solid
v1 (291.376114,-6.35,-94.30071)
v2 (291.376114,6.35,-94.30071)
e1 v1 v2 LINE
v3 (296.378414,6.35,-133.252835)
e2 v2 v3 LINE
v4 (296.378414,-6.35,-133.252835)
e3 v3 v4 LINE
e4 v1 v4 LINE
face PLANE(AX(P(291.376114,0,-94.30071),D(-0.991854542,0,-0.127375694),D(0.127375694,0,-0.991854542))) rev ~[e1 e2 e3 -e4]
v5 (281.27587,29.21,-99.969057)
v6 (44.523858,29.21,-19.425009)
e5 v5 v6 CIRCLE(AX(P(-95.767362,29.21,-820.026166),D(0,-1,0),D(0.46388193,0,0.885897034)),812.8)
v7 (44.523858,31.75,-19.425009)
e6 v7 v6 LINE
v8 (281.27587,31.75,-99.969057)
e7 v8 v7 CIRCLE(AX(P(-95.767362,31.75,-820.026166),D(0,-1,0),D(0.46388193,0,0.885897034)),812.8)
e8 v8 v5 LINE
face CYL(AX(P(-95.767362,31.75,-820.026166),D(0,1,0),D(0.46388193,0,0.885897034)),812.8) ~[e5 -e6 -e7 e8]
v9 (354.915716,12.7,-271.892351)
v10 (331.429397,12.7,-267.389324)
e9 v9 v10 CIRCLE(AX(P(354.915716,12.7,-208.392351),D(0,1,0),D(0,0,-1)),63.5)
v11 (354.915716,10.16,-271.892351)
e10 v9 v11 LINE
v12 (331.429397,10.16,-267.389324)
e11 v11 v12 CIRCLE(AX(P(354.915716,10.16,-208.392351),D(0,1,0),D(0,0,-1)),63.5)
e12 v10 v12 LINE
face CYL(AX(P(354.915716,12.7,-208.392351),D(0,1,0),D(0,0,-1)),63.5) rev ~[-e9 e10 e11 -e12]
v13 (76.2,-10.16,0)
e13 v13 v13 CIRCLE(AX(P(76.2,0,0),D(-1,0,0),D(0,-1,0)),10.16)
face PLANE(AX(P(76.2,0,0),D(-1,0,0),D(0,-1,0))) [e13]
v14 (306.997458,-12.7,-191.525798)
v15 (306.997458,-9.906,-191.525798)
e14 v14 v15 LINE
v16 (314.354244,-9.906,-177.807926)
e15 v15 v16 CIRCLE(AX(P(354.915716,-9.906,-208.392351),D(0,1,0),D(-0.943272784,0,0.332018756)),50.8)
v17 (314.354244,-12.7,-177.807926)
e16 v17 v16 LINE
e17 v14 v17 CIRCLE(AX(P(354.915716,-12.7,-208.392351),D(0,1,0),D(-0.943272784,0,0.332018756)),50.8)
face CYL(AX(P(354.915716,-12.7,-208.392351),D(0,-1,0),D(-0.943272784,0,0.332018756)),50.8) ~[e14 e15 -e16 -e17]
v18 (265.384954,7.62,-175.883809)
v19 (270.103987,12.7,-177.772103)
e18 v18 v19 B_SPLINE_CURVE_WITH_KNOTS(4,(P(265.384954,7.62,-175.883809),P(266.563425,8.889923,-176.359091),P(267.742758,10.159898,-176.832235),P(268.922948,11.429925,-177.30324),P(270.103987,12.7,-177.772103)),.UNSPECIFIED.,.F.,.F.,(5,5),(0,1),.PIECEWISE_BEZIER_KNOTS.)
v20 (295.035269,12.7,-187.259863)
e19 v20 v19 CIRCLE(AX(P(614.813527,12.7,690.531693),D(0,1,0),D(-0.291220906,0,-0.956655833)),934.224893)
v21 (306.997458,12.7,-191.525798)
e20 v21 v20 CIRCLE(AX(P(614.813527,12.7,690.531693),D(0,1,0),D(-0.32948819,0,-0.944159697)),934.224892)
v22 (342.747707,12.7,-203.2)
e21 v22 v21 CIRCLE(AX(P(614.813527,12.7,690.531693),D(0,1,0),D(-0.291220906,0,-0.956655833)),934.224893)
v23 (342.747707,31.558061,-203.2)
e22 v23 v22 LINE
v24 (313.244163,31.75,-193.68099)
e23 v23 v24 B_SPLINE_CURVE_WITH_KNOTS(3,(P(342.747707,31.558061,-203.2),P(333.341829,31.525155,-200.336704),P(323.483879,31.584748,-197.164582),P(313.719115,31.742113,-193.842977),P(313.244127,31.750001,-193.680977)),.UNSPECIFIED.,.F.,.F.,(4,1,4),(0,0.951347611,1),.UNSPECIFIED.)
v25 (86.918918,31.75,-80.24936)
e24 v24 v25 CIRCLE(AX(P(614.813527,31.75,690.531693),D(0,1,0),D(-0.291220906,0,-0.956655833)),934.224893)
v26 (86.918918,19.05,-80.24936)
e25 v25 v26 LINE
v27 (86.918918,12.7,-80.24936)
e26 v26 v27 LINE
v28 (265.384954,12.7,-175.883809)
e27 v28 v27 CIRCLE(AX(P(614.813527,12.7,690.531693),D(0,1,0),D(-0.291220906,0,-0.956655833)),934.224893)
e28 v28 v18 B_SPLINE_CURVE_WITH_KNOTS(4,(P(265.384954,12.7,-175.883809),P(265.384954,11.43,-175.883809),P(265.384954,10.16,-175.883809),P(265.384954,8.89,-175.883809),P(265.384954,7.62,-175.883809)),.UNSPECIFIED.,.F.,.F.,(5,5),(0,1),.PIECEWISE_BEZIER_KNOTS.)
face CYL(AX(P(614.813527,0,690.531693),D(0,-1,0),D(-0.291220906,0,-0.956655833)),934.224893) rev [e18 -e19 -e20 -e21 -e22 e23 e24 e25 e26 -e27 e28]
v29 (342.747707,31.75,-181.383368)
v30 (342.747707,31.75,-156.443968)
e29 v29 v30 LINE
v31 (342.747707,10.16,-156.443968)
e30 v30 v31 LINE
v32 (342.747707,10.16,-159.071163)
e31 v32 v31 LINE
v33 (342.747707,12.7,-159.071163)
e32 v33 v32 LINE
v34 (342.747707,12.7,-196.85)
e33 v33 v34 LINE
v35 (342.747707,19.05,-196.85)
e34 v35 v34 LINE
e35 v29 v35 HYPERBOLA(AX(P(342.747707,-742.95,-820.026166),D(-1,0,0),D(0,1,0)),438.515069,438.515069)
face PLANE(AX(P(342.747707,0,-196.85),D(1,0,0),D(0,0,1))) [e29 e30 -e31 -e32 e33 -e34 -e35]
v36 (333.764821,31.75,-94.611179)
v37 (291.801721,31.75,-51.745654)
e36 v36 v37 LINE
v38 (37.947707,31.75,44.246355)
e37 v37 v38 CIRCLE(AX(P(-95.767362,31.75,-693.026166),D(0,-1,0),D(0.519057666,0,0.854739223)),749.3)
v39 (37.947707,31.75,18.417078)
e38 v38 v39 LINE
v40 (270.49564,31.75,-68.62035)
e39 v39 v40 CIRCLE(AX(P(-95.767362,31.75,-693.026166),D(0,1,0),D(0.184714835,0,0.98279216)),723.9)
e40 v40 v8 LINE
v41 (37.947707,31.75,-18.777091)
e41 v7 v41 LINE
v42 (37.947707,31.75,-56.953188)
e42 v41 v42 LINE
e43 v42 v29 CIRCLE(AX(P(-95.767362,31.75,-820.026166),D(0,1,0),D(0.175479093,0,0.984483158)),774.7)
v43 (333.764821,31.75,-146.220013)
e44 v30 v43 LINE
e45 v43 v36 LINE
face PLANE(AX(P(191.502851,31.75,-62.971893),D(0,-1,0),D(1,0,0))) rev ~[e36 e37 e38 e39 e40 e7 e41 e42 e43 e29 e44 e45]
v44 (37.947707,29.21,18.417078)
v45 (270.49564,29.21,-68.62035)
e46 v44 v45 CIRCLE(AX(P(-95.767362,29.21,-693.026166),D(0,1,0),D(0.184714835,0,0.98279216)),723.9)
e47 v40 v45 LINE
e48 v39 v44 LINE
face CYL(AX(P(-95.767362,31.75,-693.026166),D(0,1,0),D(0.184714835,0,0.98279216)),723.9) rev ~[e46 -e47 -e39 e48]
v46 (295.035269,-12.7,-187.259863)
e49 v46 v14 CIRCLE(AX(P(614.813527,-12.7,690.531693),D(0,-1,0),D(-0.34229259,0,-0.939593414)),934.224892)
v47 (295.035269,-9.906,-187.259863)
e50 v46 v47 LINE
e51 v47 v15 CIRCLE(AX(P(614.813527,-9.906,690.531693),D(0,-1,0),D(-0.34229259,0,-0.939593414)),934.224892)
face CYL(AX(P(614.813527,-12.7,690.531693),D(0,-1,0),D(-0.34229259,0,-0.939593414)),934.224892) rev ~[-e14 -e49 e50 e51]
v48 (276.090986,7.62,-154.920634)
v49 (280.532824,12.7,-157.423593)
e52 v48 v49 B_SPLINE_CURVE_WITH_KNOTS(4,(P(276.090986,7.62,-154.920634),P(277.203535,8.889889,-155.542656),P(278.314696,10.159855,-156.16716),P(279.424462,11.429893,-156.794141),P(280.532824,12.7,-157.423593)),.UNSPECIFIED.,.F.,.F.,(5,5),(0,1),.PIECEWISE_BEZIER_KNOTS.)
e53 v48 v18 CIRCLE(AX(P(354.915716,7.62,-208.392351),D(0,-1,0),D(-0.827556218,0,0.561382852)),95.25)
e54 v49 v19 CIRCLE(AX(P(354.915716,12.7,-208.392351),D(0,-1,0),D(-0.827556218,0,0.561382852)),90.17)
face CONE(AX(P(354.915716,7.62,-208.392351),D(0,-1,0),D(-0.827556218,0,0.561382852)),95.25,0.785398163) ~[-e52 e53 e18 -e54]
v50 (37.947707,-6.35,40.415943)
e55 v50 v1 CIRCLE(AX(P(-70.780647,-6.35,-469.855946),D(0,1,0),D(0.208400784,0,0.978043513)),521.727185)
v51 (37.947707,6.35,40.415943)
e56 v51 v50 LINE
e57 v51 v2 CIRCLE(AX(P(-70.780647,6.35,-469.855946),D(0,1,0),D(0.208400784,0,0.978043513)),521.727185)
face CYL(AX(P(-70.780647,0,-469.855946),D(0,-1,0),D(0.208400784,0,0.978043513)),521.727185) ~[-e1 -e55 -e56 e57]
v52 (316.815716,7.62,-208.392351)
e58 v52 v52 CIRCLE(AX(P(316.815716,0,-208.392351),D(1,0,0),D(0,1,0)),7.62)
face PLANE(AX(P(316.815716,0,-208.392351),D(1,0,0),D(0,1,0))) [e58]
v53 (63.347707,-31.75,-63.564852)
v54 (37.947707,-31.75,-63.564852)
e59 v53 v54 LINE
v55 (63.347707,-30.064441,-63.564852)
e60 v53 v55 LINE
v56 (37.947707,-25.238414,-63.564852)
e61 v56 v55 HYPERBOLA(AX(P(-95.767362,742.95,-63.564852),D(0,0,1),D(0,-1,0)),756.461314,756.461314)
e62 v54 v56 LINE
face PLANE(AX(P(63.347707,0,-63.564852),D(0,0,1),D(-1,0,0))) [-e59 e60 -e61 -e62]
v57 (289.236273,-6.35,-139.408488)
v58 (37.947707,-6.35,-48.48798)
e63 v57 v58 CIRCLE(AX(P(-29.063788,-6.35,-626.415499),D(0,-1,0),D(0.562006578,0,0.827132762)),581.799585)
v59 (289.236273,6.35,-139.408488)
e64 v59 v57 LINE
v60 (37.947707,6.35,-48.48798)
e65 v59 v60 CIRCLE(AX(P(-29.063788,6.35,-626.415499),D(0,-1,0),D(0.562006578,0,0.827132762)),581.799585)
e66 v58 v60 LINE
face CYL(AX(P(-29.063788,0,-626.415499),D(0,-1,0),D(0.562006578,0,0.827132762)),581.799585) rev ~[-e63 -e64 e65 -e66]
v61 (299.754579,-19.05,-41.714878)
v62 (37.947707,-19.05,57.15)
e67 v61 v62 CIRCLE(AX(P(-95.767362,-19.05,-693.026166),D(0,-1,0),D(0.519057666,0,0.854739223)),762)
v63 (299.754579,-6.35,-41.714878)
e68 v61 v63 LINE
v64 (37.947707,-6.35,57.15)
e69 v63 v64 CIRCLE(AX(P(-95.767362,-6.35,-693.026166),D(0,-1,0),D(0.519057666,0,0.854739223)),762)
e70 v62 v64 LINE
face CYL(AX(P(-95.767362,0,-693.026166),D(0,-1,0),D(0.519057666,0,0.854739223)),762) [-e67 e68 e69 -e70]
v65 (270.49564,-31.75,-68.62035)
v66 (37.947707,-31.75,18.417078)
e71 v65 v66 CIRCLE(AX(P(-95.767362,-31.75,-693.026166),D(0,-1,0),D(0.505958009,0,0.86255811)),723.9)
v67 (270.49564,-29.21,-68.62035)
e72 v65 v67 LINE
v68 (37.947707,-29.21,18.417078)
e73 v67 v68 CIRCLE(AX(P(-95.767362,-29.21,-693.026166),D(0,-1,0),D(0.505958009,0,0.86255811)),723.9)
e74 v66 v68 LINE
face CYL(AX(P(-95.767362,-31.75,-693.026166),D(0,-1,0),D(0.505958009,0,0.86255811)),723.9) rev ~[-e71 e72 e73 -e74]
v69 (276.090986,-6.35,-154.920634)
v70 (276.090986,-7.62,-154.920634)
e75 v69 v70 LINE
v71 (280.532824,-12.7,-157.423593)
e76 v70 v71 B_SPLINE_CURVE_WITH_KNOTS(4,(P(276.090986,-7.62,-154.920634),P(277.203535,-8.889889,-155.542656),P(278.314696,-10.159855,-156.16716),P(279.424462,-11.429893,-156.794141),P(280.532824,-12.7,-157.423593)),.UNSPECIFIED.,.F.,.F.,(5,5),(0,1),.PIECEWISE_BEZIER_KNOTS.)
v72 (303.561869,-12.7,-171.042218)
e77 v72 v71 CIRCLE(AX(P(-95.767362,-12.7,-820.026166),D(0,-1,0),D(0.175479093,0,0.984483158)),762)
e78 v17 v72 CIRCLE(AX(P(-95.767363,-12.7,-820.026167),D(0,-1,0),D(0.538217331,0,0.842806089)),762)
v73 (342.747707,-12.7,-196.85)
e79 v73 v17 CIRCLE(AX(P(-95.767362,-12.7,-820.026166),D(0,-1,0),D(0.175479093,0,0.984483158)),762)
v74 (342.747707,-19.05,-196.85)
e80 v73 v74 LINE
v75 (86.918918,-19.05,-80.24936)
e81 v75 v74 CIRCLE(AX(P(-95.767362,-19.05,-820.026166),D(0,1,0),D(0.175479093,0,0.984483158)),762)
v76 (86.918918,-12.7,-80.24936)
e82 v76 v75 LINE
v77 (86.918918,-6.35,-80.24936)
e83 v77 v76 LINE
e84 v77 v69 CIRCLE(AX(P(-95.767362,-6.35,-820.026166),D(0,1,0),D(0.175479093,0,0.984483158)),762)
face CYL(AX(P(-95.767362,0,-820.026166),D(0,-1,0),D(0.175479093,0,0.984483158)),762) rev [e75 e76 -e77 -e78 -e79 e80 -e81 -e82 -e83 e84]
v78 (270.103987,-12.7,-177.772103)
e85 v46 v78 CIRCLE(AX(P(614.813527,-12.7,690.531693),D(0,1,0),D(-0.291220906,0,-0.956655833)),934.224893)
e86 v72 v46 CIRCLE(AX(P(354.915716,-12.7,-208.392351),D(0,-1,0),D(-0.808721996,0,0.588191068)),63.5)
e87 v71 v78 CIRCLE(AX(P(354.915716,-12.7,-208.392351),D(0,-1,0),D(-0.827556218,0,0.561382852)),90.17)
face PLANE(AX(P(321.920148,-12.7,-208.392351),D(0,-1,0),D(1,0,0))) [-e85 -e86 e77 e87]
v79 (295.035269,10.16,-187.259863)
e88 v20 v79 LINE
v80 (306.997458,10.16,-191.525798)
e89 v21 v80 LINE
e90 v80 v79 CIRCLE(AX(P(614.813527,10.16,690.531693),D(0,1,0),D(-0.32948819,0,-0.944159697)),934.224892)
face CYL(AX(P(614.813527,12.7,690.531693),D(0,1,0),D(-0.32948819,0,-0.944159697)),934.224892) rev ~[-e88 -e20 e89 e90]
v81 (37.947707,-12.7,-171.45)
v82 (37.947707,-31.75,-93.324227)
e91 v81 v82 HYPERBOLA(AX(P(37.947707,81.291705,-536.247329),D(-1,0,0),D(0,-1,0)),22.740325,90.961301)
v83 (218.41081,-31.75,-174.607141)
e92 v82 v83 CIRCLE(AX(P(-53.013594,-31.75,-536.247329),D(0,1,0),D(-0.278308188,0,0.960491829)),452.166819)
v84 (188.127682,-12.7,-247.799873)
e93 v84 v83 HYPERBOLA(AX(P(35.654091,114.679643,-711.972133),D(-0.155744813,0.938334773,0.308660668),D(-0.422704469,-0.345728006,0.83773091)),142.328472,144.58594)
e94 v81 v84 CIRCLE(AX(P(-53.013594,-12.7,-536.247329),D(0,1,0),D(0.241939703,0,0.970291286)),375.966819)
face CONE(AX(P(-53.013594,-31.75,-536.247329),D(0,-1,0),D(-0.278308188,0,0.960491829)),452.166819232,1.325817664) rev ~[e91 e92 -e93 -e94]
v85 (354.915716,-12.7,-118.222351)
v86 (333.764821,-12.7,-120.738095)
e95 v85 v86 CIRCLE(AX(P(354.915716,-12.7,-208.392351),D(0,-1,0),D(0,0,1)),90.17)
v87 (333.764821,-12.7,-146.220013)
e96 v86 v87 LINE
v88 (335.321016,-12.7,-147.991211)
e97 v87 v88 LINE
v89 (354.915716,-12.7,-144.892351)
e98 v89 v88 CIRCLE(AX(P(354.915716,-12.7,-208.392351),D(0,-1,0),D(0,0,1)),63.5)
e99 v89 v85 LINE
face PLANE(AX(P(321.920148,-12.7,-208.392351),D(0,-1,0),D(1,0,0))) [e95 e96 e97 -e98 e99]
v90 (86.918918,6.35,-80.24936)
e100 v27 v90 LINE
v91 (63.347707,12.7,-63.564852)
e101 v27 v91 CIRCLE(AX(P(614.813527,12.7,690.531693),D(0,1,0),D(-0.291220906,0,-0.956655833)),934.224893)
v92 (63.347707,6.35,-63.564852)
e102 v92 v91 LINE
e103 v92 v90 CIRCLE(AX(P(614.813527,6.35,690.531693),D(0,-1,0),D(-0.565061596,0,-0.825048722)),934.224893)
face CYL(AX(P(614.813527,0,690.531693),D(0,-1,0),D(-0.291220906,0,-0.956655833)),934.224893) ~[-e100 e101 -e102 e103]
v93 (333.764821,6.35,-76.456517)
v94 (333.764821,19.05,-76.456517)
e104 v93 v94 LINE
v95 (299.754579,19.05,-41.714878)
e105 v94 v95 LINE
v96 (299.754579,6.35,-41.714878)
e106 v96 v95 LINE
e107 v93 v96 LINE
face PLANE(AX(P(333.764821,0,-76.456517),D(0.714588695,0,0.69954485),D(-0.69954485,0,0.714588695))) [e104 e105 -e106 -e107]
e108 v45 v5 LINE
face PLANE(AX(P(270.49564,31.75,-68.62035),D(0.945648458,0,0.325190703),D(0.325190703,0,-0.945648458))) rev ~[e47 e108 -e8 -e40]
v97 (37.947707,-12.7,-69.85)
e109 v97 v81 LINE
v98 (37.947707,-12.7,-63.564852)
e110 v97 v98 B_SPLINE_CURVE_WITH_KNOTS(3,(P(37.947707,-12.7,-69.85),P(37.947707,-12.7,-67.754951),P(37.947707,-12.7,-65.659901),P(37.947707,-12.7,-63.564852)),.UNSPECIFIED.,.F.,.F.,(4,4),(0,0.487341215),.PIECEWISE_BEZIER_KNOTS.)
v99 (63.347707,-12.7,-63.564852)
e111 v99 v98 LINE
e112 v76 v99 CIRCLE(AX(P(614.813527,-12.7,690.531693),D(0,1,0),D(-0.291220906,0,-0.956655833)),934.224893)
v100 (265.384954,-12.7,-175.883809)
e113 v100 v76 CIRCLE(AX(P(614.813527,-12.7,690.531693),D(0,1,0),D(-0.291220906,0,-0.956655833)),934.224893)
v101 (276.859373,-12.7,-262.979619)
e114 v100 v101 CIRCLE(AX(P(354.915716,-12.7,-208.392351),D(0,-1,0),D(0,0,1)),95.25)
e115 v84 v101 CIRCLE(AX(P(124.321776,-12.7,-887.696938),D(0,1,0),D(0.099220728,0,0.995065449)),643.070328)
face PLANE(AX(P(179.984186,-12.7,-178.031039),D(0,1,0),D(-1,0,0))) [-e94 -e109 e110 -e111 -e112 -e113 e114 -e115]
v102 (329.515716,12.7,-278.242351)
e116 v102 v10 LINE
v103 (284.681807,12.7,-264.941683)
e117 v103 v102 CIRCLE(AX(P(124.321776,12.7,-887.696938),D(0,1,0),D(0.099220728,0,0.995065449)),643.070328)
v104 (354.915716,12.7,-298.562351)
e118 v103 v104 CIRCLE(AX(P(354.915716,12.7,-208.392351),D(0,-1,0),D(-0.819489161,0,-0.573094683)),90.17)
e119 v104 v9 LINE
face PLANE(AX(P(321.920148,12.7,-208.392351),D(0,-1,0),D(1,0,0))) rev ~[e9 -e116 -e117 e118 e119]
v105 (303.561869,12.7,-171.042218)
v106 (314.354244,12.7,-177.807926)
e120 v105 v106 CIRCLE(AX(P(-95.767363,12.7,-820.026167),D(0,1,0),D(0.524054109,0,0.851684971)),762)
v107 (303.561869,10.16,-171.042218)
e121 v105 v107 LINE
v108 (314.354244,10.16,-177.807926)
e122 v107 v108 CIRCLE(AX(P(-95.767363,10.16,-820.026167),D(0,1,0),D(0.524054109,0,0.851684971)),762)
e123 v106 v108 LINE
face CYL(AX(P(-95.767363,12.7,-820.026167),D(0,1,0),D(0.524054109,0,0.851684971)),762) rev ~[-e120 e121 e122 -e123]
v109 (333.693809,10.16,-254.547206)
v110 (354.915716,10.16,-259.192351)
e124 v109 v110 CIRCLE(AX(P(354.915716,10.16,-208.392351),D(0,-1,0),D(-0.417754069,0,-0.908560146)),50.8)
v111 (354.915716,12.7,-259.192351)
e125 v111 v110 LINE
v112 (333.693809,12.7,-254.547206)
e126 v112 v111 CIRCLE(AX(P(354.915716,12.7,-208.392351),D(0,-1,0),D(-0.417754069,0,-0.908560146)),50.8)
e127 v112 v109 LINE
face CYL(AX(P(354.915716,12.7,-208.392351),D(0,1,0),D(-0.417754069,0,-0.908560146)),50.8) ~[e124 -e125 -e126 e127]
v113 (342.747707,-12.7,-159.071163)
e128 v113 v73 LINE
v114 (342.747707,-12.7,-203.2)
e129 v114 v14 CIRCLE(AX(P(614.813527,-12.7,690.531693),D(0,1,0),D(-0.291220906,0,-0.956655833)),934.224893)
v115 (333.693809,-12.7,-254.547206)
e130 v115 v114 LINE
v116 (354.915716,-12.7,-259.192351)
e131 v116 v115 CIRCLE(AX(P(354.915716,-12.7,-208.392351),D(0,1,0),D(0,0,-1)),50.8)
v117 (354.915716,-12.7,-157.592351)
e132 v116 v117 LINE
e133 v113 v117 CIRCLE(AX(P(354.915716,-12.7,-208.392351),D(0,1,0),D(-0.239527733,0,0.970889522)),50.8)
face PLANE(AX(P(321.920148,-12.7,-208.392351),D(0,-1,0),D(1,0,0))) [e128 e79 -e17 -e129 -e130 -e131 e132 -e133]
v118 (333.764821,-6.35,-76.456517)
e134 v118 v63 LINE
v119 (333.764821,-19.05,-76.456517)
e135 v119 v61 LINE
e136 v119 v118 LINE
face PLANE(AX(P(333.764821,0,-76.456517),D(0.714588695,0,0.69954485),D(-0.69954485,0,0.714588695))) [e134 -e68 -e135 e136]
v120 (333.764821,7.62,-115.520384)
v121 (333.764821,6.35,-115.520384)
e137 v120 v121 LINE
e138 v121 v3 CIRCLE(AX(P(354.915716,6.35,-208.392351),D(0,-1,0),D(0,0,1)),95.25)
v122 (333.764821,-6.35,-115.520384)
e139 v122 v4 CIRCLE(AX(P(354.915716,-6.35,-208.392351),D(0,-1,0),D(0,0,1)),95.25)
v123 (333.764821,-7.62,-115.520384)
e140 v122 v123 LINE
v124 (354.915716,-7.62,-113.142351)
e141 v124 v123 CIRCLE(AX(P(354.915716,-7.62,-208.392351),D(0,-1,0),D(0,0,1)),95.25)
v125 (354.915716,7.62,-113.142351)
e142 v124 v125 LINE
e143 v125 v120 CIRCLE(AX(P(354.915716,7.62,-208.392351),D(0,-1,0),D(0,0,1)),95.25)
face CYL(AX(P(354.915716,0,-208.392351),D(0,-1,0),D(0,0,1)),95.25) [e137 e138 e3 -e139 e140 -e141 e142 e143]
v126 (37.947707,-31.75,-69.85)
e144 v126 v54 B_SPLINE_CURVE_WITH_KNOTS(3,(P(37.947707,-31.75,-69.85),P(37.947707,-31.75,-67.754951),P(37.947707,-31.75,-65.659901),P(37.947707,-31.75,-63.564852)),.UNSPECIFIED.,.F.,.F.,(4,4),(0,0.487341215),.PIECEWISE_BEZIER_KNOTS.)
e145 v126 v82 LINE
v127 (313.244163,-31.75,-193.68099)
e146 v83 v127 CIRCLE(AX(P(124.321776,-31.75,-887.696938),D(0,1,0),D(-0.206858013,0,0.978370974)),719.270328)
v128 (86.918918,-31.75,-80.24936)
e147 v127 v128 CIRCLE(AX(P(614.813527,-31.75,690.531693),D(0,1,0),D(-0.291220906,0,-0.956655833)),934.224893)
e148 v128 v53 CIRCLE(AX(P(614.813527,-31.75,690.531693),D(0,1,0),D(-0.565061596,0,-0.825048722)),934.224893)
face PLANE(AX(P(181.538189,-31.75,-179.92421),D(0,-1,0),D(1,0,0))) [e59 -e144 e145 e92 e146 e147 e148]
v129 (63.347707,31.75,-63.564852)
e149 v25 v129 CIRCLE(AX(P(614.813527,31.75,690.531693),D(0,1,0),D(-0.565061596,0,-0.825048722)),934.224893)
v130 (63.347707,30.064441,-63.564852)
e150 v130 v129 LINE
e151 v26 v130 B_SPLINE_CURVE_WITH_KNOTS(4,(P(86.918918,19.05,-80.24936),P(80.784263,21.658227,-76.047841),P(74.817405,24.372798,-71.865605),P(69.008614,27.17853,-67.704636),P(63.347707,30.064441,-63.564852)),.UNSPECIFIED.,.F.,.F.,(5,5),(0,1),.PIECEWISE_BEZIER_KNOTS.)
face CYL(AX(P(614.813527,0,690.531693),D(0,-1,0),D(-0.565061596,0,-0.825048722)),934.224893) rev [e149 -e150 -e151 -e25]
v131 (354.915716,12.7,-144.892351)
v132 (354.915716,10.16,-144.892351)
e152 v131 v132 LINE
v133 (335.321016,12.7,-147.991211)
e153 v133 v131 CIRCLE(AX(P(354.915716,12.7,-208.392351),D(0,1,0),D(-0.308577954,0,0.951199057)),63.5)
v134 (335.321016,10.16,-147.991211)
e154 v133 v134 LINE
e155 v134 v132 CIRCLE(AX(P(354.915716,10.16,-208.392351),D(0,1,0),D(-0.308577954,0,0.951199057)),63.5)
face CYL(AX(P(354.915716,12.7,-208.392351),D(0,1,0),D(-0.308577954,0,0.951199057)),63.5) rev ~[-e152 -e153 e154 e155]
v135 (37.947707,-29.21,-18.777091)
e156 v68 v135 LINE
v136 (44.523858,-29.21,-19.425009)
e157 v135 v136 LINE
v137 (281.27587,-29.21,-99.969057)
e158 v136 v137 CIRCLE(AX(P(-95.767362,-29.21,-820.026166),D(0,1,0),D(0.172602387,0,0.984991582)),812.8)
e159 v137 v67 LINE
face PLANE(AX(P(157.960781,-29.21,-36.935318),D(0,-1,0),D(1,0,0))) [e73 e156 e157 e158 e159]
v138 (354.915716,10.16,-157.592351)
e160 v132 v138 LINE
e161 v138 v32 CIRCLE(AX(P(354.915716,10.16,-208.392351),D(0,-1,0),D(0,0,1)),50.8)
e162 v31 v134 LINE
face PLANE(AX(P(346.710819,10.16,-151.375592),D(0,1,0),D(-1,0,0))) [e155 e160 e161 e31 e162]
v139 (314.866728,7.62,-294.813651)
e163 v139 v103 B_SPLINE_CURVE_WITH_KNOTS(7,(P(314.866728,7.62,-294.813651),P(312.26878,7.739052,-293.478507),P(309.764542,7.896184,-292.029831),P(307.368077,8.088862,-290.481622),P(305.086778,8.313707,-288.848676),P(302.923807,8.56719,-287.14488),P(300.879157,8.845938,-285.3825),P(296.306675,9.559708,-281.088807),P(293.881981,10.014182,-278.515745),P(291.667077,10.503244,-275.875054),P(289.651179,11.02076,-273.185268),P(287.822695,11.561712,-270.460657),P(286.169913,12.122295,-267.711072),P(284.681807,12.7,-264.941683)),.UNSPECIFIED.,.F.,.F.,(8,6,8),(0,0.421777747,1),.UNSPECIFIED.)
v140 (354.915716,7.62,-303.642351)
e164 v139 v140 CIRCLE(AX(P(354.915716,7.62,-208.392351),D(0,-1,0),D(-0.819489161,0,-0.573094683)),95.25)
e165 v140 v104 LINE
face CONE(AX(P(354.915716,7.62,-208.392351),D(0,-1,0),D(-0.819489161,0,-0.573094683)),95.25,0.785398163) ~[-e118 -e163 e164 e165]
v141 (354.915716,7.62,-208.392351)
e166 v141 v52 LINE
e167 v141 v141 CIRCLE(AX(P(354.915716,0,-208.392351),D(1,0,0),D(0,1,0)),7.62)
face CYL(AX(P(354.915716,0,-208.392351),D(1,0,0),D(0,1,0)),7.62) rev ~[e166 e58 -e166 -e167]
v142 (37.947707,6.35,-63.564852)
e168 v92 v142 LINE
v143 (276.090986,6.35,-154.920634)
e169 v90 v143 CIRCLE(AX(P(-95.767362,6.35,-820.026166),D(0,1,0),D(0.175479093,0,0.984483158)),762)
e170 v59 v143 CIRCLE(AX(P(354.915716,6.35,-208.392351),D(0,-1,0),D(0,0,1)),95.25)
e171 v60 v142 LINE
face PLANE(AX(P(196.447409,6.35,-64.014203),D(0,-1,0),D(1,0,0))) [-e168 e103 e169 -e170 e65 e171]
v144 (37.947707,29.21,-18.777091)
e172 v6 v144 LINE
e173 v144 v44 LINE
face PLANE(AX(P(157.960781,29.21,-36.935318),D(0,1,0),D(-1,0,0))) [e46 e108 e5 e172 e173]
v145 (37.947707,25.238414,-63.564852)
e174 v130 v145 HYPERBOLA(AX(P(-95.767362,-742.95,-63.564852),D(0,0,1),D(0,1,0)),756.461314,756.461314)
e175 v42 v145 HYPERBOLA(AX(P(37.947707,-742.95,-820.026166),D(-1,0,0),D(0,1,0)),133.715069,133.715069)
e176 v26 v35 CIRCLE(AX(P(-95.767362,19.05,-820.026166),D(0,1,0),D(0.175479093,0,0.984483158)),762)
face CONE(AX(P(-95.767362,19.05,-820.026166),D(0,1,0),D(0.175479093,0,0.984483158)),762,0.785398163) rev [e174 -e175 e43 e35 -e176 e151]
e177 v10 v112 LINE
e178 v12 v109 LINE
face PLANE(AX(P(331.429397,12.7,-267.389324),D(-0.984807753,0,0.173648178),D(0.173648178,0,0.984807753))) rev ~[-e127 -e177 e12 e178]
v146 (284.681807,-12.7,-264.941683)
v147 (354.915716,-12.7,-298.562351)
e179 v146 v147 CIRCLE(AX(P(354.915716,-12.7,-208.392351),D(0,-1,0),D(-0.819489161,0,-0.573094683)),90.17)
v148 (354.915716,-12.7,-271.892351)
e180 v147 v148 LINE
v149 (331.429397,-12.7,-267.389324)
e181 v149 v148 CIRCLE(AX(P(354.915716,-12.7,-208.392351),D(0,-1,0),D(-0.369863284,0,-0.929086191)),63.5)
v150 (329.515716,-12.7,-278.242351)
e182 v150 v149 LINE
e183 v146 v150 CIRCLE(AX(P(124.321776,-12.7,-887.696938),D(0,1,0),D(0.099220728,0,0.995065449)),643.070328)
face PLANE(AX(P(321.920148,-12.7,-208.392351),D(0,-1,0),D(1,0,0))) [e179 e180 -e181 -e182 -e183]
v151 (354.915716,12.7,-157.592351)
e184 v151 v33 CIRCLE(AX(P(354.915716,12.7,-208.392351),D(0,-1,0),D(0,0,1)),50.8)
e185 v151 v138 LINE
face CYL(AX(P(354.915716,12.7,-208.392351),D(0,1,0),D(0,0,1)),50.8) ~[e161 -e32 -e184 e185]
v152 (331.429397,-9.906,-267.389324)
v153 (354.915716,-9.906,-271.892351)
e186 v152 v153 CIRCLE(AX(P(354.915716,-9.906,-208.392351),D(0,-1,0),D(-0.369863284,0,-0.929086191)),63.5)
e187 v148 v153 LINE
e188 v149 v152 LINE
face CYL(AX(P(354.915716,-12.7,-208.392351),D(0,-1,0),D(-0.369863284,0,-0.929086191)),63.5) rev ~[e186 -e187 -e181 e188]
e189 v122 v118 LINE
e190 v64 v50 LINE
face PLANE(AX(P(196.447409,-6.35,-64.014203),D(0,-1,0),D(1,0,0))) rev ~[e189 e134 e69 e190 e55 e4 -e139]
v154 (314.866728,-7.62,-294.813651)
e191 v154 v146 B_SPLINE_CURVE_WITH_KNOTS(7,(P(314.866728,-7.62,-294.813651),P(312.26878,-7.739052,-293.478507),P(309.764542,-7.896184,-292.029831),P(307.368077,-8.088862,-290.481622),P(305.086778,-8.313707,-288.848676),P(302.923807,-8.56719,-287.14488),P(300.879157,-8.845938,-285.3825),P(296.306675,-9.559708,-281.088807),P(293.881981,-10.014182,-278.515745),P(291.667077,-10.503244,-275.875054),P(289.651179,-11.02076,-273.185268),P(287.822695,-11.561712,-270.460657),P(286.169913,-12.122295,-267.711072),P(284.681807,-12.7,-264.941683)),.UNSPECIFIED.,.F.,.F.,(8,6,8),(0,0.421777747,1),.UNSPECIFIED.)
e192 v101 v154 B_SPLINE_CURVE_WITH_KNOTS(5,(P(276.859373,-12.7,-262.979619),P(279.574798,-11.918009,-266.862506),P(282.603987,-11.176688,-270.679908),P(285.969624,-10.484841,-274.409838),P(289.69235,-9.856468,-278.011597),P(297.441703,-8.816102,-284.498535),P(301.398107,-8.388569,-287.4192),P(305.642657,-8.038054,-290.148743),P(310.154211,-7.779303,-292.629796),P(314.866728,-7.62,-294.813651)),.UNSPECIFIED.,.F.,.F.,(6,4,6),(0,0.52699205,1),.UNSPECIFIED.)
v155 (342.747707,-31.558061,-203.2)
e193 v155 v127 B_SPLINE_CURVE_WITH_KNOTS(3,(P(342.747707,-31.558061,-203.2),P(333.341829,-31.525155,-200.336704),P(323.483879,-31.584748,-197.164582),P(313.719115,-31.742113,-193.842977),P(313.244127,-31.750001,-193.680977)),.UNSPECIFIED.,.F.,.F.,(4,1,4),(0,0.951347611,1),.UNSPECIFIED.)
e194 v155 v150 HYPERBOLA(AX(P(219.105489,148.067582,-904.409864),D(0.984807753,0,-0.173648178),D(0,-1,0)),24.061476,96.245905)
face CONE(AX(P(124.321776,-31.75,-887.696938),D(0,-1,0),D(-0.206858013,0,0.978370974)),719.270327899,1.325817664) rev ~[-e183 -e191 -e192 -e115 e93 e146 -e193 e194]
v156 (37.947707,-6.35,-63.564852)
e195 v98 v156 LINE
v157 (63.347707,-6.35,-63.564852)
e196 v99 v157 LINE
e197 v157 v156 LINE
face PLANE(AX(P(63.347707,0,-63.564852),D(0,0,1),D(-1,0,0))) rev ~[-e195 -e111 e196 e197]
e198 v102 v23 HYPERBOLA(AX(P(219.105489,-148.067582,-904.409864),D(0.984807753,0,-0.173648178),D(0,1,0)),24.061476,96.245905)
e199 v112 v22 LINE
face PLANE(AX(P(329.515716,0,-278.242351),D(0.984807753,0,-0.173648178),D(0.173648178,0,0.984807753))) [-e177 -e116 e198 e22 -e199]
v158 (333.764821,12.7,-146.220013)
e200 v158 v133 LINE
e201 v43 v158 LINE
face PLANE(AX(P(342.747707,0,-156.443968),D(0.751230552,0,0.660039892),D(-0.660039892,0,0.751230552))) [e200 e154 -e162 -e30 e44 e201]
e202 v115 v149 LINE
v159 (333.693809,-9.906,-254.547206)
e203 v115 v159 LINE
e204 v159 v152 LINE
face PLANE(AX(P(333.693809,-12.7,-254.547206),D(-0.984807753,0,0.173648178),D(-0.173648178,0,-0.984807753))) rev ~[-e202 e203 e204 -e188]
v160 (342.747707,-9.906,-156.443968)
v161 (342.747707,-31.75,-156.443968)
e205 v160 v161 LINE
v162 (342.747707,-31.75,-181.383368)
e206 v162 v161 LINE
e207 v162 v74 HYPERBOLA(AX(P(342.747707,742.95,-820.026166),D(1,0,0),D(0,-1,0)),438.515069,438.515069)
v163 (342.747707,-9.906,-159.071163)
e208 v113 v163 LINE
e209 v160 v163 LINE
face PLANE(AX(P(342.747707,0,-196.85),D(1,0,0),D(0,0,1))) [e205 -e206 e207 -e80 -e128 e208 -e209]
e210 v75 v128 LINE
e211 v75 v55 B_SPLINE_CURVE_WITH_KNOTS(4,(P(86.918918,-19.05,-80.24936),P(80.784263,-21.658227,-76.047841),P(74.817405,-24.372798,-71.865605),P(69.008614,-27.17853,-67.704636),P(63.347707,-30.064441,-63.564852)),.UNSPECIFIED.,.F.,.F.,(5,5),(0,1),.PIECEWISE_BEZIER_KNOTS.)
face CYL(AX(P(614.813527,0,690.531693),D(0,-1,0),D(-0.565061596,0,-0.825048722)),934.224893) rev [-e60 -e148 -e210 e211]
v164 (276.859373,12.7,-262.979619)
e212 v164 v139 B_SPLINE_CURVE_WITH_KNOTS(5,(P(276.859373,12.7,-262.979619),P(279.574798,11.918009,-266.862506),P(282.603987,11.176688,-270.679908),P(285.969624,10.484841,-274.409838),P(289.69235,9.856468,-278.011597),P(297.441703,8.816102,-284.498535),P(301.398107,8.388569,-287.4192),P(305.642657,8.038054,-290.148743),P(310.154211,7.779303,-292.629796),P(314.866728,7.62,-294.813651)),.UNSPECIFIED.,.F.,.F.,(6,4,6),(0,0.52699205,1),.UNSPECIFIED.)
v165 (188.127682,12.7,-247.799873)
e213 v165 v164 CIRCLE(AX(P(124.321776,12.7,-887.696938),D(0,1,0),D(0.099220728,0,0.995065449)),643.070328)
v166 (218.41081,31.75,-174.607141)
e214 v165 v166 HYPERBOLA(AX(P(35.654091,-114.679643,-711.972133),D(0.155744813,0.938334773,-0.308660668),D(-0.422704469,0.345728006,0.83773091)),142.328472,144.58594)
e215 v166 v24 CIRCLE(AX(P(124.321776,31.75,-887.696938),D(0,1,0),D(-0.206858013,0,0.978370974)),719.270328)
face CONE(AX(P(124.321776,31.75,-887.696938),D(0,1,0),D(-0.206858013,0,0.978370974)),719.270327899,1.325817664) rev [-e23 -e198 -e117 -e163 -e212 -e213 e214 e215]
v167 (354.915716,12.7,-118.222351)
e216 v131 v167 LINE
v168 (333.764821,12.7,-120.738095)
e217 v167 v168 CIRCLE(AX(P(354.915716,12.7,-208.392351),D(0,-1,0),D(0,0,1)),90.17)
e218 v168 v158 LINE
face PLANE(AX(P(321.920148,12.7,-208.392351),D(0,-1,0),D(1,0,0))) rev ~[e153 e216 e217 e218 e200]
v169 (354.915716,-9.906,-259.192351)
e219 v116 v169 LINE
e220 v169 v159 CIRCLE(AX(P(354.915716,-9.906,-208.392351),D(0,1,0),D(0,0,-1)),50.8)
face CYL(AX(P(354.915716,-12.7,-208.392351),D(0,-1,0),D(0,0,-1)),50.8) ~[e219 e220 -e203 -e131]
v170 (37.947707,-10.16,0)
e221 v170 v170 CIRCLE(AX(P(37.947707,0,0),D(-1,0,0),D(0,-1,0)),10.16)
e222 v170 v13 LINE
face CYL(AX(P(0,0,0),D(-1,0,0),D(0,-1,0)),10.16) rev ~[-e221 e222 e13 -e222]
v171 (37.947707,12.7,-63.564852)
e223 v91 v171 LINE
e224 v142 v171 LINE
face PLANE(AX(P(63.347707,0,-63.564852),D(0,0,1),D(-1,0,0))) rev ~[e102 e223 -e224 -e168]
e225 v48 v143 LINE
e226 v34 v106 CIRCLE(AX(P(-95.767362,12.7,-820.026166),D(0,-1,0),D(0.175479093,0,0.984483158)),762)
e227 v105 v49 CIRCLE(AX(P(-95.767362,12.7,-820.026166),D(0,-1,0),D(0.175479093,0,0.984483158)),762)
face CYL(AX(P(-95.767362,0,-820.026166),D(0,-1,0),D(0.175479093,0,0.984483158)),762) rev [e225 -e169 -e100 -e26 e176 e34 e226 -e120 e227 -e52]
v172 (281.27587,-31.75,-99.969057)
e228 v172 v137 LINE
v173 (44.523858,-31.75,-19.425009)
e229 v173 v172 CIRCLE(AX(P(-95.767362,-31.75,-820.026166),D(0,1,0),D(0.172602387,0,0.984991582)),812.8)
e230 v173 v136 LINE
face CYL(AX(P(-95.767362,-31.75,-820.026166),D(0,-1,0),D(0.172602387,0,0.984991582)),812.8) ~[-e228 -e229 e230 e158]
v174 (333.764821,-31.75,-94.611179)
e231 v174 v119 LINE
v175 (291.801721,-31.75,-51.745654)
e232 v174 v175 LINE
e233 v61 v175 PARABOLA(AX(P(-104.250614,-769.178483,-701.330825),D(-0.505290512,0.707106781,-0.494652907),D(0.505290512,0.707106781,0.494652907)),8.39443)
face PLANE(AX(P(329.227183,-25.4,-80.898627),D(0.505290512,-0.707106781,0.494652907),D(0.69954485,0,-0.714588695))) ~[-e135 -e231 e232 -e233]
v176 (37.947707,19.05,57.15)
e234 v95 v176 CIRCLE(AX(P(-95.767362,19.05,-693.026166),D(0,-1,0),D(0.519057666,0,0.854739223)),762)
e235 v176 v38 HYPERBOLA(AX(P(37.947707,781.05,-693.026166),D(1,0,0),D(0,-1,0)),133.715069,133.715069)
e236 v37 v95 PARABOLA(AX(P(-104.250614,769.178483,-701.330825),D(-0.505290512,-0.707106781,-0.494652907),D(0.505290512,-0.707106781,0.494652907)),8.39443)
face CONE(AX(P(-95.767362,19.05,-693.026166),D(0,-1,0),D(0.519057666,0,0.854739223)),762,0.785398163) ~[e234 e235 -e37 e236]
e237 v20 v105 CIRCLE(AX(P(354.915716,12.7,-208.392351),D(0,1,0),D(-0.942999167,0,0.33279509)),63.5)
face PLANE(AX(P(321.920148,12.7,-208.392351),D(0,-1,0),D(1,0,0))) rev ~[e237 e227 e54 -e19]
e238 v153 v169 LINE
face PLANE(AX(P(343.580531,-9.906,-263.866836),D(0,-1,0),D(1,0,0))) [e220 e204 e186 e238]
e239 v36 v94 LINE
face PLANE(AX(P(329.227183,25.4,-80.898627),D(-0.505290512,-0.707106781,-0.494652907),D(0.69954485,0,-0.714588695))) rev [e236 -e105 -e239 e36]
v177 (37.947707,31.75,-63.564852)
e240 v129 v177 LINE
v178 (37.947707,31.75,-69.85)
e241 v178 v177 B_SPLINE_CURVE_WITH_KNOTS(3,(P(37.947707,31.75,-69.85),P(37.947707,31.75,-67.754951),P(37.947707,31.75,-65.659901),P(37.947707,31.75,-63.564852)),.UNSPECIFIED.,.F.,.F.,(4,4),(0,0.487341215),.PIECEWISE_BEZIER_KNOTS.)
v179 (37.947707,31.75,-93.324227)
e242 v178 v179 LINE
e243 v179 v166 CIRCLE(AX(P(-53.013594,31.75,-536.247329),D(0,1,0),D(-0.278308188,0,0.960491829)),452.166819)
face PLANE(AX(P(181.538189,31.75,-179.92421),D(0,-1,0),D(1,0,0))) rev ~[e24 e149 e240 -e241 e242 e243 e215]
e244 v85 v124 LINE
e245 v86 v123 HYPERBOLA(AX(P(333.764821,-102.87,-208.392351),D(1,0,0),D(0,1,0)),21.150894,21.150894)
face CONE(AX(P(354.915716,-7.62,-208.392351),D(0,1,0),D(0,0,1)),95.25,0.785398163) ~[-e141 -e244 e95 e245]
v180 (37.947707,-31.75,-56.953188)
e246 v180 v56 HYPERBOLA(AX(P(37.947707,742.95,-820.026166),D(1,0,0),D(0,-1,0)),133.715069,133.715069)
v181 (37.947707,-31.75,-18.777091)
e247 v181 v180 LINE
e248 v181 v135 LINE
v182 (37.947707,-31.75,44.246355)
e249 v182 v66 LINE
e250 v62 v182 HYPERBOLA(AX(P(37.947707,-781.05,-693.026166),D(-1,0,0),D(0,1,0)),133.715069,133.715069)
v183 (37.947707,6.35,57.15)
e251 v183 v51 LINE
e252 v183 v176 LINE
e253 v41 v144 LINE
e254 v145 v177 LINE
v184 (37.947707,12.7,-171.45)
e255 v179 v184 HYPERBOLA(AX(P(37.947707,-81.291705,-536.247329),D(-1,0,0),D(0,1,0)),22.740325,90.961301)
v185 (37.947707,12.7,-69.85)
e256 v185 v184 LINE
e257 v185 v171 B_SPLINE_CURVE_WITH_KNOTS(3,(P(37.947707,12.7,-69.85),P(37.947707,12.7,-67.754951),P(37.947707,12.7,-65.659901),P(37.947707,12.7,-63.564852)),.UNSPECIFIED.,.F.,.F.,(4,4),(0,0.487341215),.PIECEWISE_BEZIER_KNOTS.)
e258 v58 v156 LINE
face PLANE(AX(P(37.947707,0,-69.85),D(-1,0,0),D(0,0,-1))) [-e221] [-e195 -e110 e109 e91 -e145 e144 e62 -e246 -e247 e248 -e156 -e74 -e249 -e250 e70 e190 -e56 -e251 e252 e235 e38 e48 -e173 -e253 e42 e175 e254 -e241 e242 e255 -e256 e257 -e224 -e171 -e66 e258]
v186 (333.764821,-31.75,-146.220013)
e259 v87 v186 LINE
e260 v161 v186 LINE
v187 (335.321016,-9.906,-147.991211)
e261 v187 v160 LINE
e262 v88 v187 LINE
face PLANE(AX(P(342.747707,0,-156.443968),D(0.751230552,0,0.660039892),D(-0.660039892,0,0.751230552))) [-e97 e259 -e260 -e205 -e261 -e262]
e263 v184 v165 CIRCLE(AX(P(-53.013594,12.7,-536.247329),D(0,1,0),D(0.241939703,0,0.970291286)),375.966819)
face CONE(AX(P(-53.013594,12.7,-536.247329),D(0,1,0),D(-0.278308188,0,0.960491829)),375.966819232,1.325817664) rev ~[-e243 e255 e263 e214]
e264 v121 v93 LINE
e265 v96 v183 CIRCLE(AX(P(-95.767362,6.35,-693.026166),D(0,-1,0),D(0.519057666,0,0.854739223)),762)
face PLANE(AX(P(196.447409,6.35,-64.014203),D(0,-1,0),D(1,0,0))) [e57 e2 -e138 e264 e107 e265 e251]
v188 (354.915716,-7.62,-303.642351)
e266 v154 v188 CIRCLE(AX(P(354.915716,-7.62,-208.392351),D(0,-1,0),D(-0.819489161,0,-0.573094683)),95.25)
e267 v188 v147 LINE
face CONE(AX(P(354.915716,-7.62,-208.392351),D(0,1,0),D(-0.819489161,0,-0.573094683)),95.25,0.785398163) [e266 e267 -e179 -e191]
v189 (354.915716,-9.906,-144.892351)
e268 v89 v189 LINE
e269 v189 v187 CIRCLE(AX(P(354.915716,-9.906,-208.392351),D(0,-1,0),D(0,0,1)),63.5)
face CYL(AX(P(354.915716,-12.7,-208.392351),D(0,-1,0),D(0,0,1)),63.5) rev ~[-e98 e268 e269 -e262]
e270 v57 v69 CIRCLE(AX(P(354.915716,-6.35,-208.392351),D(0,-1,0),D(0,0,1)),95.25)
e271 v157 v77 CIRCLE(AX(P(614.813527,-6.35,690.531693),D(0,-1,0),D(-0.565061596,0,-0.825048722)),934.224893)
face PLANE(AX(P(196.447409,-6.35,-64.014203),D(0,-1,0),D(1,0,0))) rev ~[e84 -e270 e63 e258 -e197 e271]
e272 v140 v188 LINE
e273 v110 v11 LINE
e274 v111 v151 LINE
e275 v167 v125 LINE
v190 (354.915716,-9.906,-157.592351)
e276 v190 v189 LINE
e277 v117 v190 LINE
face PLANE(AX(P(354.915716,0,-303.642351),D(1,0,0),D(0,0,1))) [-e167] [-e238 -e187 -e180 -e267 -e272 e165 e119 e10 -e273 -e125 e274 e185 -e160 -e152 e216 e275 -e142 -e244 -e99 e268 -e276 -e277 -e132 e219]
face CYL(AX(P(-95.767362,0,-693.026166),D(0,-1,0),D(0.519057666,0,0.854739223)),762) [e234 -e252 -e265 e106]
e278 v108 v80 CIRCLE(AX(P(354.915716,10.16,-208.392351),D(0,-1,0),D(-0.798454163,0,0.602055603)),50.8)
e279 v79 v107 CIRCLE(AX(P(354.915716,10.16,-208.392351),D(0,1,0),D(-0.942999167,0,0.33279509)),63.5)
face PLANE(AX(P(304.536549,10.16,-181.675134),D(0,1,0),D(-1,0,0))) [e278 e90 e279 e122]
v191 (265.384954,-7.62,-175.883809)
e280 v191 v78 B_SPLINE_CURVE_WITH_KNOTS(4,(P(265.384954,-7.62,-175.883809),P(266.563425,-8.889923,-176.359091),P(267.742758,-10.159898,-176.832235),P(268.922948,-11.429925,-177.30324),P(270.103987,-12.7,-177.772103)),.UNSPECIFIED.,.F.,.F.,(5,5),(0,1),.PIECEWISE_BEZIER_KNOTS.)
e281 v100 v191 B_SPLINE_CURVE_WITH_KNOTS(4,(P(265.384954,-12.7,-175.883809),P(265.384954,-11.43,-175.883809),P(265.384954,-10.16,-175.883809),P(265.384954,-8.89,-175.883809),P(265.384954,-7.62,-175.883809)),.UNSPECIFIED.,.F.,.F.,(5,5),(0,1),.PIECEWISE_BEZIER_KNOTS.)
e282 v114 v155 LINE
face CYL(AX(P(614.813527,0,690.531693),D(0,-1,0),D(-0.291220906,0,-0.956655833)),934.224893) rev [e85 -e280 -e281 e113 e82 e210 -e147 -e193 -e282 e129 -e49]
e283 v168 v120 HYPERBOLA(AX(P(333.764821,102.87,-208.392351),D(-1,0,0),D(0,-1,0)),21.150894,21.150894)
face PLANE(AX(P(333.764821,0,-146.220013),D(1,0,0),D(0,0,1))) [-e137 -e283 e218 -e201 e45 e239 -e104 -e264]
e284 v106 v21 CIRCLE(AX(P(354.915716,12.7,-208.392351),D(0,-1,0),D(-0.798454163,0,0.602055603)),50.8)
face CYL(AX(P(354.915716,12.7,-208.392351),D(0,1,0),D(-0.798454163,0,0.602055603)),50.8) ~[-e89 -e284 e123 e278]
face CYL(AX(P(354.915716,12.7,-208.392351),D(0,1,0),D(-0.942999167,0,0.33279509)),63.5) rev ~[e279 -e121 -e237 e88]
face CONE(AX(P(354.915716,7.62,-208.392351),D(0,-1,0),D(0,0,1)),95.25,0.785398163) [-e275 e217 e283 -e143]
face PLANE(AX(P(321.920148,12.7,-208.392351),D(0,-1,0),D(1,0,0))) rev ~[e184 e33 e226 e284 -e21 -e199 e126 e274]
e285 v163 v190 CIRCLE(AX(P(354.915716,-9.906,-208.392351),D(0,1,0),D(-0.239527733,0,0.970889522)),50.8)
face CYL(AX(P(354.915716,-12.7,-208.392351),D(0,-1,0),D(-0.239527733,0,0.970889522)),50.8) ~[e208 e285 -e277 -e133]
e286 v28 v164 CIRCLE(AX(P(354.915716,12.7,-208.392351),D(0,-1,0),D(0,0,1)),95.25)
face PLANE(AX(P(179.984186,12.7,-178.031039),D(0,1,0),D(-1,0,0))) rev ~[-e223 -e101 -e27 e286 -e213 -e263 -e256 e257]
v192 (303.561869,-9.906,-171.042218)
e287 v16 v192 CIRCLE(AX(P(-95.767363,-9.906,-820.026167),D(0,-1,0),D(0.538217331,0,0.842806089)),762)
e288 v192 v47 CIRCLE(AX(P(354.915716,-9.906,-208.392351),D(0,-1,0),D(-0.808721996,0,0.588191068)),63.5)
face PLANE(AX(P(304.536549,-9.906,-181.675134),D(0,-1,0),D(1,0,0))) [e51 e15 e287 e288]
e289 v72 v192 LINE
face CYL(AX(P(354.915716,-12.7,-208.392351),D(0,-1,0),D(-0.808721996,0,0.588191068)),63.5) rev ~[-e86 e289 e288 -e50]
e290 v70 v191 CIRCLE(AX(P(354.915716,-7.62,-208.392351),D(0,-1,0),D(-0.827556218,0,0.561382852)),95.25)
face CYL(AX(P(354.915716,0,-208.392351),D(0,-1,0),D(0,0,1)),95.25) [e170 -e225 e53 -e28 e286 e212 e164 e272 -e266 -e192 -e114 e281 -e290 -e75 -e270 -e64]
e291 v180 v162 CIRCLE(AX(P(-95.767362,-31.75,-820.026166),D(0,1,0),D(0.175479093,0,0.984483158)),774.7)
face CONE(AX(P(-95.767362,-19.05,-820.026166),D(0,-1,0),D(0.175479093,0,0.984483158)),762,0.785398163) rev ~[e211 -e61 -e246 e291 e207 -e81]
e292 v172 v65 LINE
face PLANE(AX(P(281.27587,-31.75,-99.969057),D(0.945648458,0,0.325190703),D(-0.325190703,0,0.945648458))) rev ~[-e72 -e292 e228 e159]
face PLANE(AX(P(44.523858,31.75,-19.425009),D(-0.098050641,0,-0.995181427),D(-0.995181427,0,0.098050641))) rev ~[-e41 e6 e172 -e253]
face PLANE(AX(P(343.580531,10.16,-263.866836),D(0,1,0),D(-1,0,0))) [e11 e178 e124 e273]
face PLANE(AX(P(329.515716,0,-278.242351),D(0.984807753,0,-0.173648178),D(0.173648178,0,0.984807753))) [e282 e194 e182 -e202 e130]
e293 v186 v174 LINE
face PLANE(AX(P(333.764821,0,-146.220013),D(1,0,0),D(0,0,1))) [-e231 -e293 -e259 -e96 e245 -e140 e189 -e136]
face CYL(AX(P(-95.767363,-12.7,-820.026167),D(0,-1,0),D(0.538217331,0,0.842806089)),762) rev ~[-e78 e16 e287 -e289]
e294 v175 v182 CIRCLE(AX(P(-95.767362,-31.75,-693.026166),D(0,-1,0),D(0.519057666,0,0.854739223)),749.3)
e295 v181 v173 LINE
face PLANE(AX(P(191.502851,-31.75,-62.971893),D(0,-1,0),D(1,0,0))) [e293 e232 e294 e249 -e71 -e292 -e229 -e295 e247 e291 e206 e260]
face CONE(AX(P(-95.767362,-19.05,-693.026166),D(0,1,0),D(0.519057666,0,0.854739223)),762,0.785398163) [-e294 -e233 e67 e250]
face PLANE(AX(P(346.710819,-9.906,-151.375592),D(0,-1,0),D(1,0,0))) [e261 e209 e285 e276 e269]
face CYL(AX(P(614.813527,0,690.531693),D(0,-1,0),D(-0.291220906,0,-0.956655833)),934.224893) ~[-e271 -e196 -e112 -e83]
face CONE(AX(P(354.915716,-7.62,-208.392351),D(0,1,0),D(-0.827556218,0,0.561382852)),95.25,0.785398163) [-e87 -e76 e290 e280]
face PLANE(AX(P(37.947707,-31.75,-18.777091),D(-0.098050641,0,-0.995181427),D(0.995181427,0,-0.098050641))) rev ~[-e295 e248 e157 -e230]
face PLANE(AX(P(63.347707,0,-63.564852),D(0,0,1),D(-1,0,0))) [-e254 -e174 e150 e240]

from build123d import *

# Parameters (mm, degrees)
F3_DEPTH     = 31.75
F5_DEPTH     = 6.35
F6_SIZE      = 12.7
F7_SIZE      = 12.7
F9_DEPTH     = 31.75
F11_DEPTH    = 12.7
F13_T2_ANGLE = 48.1784563201
F13_T4_ANGLE = 86.2150976381
F13_T6_ANGLE = 86.2150976381
F13_T8_ANGLE = 48.1784563201
F15_DEPTH    = 12.7
F16_SIZE     = 5.08
F18_DEPTH    = 2.54
F20_DEPTH    = 2.54
F21_R        = 7.62
F22_DEPTH    = 38.1
F24_DEPTH    = 2.794
F26_DEPTH    = 2.54
F27_R        = 10.16
F27_R_2      = 9.525
F28_DEPTH    = 76.2


# Not quite as in the source:
# - a fillet or chamfer that OpenCascade refuses, or shapes differently, is made with other operations: its cross-section is extruded or revolved along the edge and cut away or added
# - a feature of the source that left no trace in its solid (it failed there, or was rolled back) is left out
# - a feature names something its author has since deleted; it is built from what else it names


with BuildPart() as f3:
    # F2 (on Front) → F3 (new body, symmetric)
    with BuildSketch(Plane.XZ):
        with BuildLine():
            Line((37.9477068782, 57.15), (37.9477068782, -69.85))
            ThreePointArc((37.9477068782, -69.85), (197.3095607255, -116.6415507663), (342.7477068782, -196.85))
            Line((342.7477068782, -196.85), (342.7477068782, -156.4439684153))
            Line((342.7477068782, -156.4439684153), (333.764821291, -146.2200134993))
            Line((333.764821291, -146.2200134993), (333.764821291, -76.4565169811))
            Line((333.764821291, -76.4565169811), (299.7545793033, -41.7148783095))
            ThreePointArc((299.7545793033, -41.7148783095), (173.42869903, 19.8395158234), (37.9477068782, 57.15))
        make_face()
    extrude(amount=F3_DEPTH, both=True)

    # F4 (on Front) → F5 (cut, symmetric)
    with BuildSketch(Plane.XZ):
        with BuildLine():
            Line((37.9477068782, -48.4879799187), (37.9477068782, -69.85))
            ThreePointArc((37.9477068782, -69.85), (197.3095607255, -116.6415507663), (342.7477068782, -196.85))
            Line((342.7477068782, -196.85), (342.7477068782, -156.4439684153))
            Line((342.7477068782, -156.4439684153), (333.764821291, -146.2200134993))
            Line((333.764821291, -146.2200134993), (333.764821291, -76.4565169811))
            Line((333.764821291, -76.4565169811), (299.7545793033, -41.7148783095))
            ThreePointArc((299.7545793033, -41.7148783095), (173.42869903, 19.8395158234), (37.9477068782, 57.15))
            Line((37.9477068782, 57.15), (37.9477068782, 40.4159426689))
            ThreePointArc((37.9477068782, 40.4159426689), (174.1077804995, -9.1728518585), (291.3761138916, -94.3007096648))
            Line((291.3761138916, -94.3007096648), (297.9114055634, -145.1900005341))
            ThreePointArc((297.9114055634, -145.1900005341), (173.776538026, -81.1205697987), (37.9477068782, -48.4879799187))
        make_face()
    extrude(amount=F5_DEPTH, both=True, mode=Mode.SUBTRACT)

    # F6
    f6_edges = [f3.edges().sort_by_distance(p)[0] for p in [
        (173.428699, -31.75, 19.839516),
        (316.7597, -31.75, -59.085698),
        (316.7597, 31.75, -59.085698),
        (173.428699, 31.75, 19.839516),
    ]]
    chamfer(f6_edges, length=F6_SIZE)

    # F7
    f7_edges = [f3.edges().sort_by_distance(p)[0] for p in [
        (197.309561, -31.75, -116.641551),
        (197.309561, 31.75, -116.641551),
    ]]
    chamfer(f7_edges, length=F7_SIZE)

    # F8 (on Front) → F9 (join, symmetric)
    with BuildSketch(Plane.XZ):
        with BuildLine():
            ThreePointArc((86.9189181185, -80.2493599938), (62.5187399917, -74.647396796), (37.9477068782, -69.85))
            Line((37.9477068782, -69.85), (37.9477068782, -171.45))
            ThreePointArc((37.9477068782, -171.45), (117.3693749826, -201.1045334968), (188.127681613, -247.7998733521))
            ThreePointArc((188.127681613, -247.7998733521), (259.6802456544, -259.033648506), (329.51571574, -278.2423507795))
            Line((329.51571574, -278.2423507795), (342.7477068782, -203.2))
            ThreePointArc((342.7477068782, -203.2), (210.1366349445, -151.4972629597), (86.9189181185, -80.2493599938))
        make_face()
        with BuildLine():
            add(Edge.make_bspline(
                [(37.9477068782, -69.85), (37.9477068782, -67.7549506267), (37.9477068782, -65.6599012534), (37.9477068782, -63.5648518801)],
                knots=[0, 0, 0, 0, 0.4873412151, 0.4873412151, 0.4873412151, 0.4873412151], degree=3))
            ThreePointArc((37.9477068782, -69.85), (62.5187399917, -74.647396796), (86.9189181185, -80.2493599938))
            ThreePointArc((86.9189181185, -80.2493599938), (75.0688400161, -71.9981901024), (63.3477068782, -63.5648518801))
            Line((63.3477068782, -63.5648518801), (37.9477068782, -63.5648518801))
        make_face()
    extrude(amount=F9_DEPTH, both=True)

    # F10 (on Front) → F11 (cut, symmetric)
    with BuildSketch(Plane.XZ):
        with BuildLine():
            add(Edge.make_bspline(
                [(37.9477068782, -69.85), (37.9477068782, -67.7549506267), (37.9477068782, -65.6599012534), (37.9477068782, -63.5648518801)],
                knots=[0, 0, 0, 0, 0.4873412151, 0.4873412151, 0.4873412151, 0.4873412151], degree=3))
            Line((37.9477068782, -69.85), (37.9477068782, -171.45))
            ThreePointArc((37.9477068782, -171.45), (117.3693749826, -201.1045334968), (188.127681613, -247.7998733521))
            ThreePointArc((188.127681613, -247.7998733521), (259.6802456544, -259.033648506), (329.51571574, -278.2423507795))
            Line((329.51571574, -278.2423507795), (342.7477068782, -203.2))
            ThreePointArc((342.7477068782, -203.2), (197.1706361591, -145.1420264492), (63.3477068782, -63.5648518801))
            Line((63.3477068782, -63.5648518801), (37.9477068782, -63.5648518801))
        make_face()
    extrude(amount=F11_DEPTH, both=True, mode=Mode.SUBTRACT)

    # F13: chamfer of 76.2 x 19.05 on 4 edges, made by hand

    # F13_s1 → F13_t2 (revolve, cut)
    with BuildSketch(Plane(origin=(-60.6535291513, 0, -12.8240400006), x_dir=(0, 1, 0), z_dir=(-0.9783709739, 0, -0.2068580127))):
        Polygon((31.75, 174.9435450059), (12.7, 251.1435450059), (31.75, 251.1435450059), align=None)
    revolve(axis=Axis((124.3217755456, 31.75, -887.6969377111), (0, 1, 0)), revolution_arc=F13_T2_ANGLE, mode=Mode.SUBTRACT)

    # F13_s3 → F13_t4 (revolve, cut)
    with BuildSketch(Plane(origin=(-192.2531449662, 0, -55.7064857223), x_dir=(0, 1, 0), z_dir=(-0.9604918286, 0, -0.2783081876))):
        Polygon((12.7, 124.3402407106), (31.75, 48.1402407106), (31.75, 124.3402407106), align=None)
    revolve(axis=Axis((-53.0135938756, 31.75, -536.2473285656), (0, 1, 0)), revolution_arc=F13_T4_ANGLE, mode=Mode.SUBTRACT)

    # F13_s5 → F13_t6 (revolve, cut)
    with BuildSketch(Plane(origin=(-192.2531449662, 0, -55.7064857223), x_dir=(0, 1, 0), z_dir=(-0.9604918286, 0, -0.2783081876))):
        Polygon((-31.75, 48.1402407106), (-12.7, 124.3402407106), (-31.75, 124.3402407106), align=None)
    revolve(axis=Axis((-53.0135938756, -31.75, -536.2473285656), (0, 1, 0)), revolution_arc=F13_T6_ANGLE, mode=Mode.SUBTRACT)

    # F13_s7 → F13_t8 (revolve, cut)
    with BuildSketch(Plane(origin=(-60.6535291513, 0, -12.8240400006), x_dir=(0, 1, 0), z_dir=(-0.9783709739, 0, -0.2068580127))):
        Polygon((-31.75, 174.9435450059), (-12.7, 251.1435450059), (-31.75, 251.1435450059), align=None)
    revolve(axis=Axis((124.3217755456, -31.75, -887.6969377111), (0, 1, 0)), revolution_arc=F13_T8_ANGLE, mode=Mode.SUBTRACT)

    # F14 (on Front) → F15 (join, symmetric)
    with BuildSketch(Plane.XZ):
        with BuildLine():
            Line((354.91571574, -208.3923507795), (354.91571574, -113.1423507795))
            ThreePointArc((354.91571574, -113.1423507795), (259.66571574, -208.3923507795), (354.91571574, -303.6423507795))
            Line((354.91571574, -303.6423507795), (354.91571574, -208.3923507795))
        make_face()
    extrude(amount=F15_DEPTH, both=True)

    # F16
    f16_edges = [f3.edges().sort_by_distance(p)[0] for p in [
        (310.909323, -12.7, -292.867199),
        (270.087911, -12.7, -165.070232),
        (344.273637, -12.7, -113.738726),
        (344.273637, 12.7, -113.738726),
        (270.087911, 12.7, -165.070232),
        (310.909323, 12.7, -292.867199),
    ]]
    chamfer(f16_edges, length=F16_SIZE)

    # F17 (on face) → F18 (cut)
    with BuildSketch(Plane.XZ.offset(31.75)):
        with BuildLine():
            Line((37.9477068782, 18.4170784308), (37.9477068782, -18.7770907031))
            Line((37.9477068782, -18.7770907031), (44.5238578239, -19.4250085564))
            ThreePointArc((44.5238578239, -19.4250085564), (166.0160786587, -50.5371993601), (281.275870441, -99.9690568843))
            Line((281.275870441, -99.9690568843), (270.4956403873, -68.620350335))
            ThreePointArc((270.4956403873, -68.620350335), (157.9813255542, -15.0565404403), (37.9477068782, 18.4170784308))
        make_face()
    extrude(amount=-F18_DEPTH, mode=Mode.SUBTRACT)

    # F19 (on face) → F20 (cut)
    with BuildSketch(Plane(origin=(0, 31.75, 0), x_dir=(-1, 0, 0), z_dir=(0, 1, 0))):
        with BuildLine():
            ThreePointArc((-37.9477068782, 18.4170784308), (-157.9813255542, -15.0565404403), (-270.4956403873, -68.620350335))
            Line((-270.4956403873, -68.620350335), (-281.275870441, -99.9690568843))
            ThreePointArc((-281.275870441, -99.9690568843), (-166.0160786587, -50.5371993601), (-44.5238578239, -19.4250085564))
            Line((-44.5238578239, -19.4250085564), (-37.9477068782, -18.7770907031))
            Line((-37.9477068782, -18.7770907031), (-37.9477068782, 18.4170784308))
        make_face()
    extrude(amount=-F20_DEPTH, mode=Mode.SUBTRACT)

    # F21 (on face) → F22 (cut)
    with BuildSketch(Plane.YZ.offset(354.91571574)):
        with Locations((0, -208.3923507795)):
            Circle(F21_R)
    extrude(amount=-F22_DEPTH, mode=Mode.SUBTRACT)

    # F23 (on face) → F24 (cut)
    with BuildSketch(Plane.XZ.offset(12.7)):
        with BuildLine():
            ThreePointArc((331.4293971954, -267.3893239326), (342.9586633277, -270.7564341738), (354.91571574, -271.8923507795))
            Line((354.91571574, -271.8923507795), (354.91571574, -259.1923507795))
            ThreePointArc((354.91571574, -259.1923507795), (344.0535486893, -258.0174787588), (333.6938090461, -254.5472061718))
            Line((333.6938090461, -254.5472061718), (331.4293971954, -267.3893239326))
        make_face()
        with BuildLine():
            ThreePointArc((342.7477068782, -159.0711630369), (348.7869449547, -157.9634090034), (354.91571574, -157.5923507795))
            Line((354.91571574, -157.5923507795), (354.91571574, -144.8923507795))
            ThreePointArc((354.91571574, -144.8923507795), (344.9966028413, -145.6718501493), (335.3210156829, -147.991210644))
            Line((335.3210156829, -147.991210644), (342.7477068782, -156.4439684153))
            Line((342.7477068782, -156.4439684153), (342.7477068782, -159.0711630369))
        make_face()
        with BuildLine():
            ThreePointArc((303.5618689691, -171.0422179573), (298.710555552, -178.8418860075), (295.0352686554, -187.2598625929))
            ThreePointArc((295.0352686554, -187.2598625929), (301.0091143651, -189.413157651), (306.9974582895, -191.5257979926))
            ThreePointArc((306.9974582895, -191.5257979926), (310.1473048853, -184.3834068306), (314.3542442481, -177.8079261419))
            ThreePointArc((314.3542442481, -177.8079261419), (308.9721939736, -174.4025207151), (303.5618689691, -171.0422179573))
        make_face()
    extrude(amount=-F24_DEPTH, mode=Mode.SUBTRACT)

    # F25 (on face) → F26 (cut)
    with BuildSketch(Plane(origin=(0, 12.7, 0), x_dir=(-1, 0, 0), z_dir=(0, 1, 0))):
        with BuildLine():
            Line((-354.91571574, -259.1923507795), (-354.91571574, -271.8923507795))
            ThreePointArc((-354.91571574, -271.8923507795), (-342.9586633277, -270.7564341738), (-331.4293971954, -267.3893239326))
            Line((-331.4293971954, -267.3893239326), (-333.6938090461, -254.5472061718))
            ThreePointArc((-333.6938090461, -254.5472061718), (-344.0535486893, -258.0174787588), (-354.91571574, -259.1923507795))
        make_face()
        with BuildLine():
            ThreePointArc((-335.3210156829, -147.991210644), (-344.9966028413, -145.6718501493), (-354.91571574, -144.8923507795))
            Line((-354.91571574, -144.8923507795), (-354.91571574, -157.5923507795))
            ThreePointArc((-354.91571574, -157.5923507795), (-348.7869449547, -157.9634090034), (-342.7477068782, -159.0711630369))
            Line((-342.7477068782, -159.0711630369), (-342.7477068782, -156.4439684153))
            Line((-342.7477068782, -156.4439684153), (-335.3210156829, -147.991210644))
        make_face()
        with BuildLine():
            ThreePointArc((-295.0352686554, -187.2598625929), (-298.710555552, -178.8418860075), (-303.5618689691, -171.0422179573))
            ThreePointArc((-303.5618689691, -171.0422179573), (-308.9721939736, -174.4025207151), (-314.3542442481, -177.8079261419))
            ThreePointArc((-314.3542442481, -177.8079261419), (-310.1473048853, -184.3834068306), (-306.9974582895, -191.5257979926))
            ThreePointArc((-306.9974582895, -191.5257979926), (-301.0091143651, -189.413157651), (-295.0352686554, -187.2598625929))
        make_face()
    extrude(amount=-F26_DEPTH, mode=Mode.SUBTRACT)

    # F27 (on face) → F28 (cut)
    with BuildSketch(Plane(origin=(0, 0, 0), x_dir=(0, -1, 0), z_dir=(-1, 0, 0))):
        Circle(F27_R)
        Circle(F27_R_2, mode=Mode.SUBTRACT)
        Circle(F27_R_2)
    extrude(amount=-F28_DEPTH, mode=Mode.SUBTRACT)


solid = f3.part
